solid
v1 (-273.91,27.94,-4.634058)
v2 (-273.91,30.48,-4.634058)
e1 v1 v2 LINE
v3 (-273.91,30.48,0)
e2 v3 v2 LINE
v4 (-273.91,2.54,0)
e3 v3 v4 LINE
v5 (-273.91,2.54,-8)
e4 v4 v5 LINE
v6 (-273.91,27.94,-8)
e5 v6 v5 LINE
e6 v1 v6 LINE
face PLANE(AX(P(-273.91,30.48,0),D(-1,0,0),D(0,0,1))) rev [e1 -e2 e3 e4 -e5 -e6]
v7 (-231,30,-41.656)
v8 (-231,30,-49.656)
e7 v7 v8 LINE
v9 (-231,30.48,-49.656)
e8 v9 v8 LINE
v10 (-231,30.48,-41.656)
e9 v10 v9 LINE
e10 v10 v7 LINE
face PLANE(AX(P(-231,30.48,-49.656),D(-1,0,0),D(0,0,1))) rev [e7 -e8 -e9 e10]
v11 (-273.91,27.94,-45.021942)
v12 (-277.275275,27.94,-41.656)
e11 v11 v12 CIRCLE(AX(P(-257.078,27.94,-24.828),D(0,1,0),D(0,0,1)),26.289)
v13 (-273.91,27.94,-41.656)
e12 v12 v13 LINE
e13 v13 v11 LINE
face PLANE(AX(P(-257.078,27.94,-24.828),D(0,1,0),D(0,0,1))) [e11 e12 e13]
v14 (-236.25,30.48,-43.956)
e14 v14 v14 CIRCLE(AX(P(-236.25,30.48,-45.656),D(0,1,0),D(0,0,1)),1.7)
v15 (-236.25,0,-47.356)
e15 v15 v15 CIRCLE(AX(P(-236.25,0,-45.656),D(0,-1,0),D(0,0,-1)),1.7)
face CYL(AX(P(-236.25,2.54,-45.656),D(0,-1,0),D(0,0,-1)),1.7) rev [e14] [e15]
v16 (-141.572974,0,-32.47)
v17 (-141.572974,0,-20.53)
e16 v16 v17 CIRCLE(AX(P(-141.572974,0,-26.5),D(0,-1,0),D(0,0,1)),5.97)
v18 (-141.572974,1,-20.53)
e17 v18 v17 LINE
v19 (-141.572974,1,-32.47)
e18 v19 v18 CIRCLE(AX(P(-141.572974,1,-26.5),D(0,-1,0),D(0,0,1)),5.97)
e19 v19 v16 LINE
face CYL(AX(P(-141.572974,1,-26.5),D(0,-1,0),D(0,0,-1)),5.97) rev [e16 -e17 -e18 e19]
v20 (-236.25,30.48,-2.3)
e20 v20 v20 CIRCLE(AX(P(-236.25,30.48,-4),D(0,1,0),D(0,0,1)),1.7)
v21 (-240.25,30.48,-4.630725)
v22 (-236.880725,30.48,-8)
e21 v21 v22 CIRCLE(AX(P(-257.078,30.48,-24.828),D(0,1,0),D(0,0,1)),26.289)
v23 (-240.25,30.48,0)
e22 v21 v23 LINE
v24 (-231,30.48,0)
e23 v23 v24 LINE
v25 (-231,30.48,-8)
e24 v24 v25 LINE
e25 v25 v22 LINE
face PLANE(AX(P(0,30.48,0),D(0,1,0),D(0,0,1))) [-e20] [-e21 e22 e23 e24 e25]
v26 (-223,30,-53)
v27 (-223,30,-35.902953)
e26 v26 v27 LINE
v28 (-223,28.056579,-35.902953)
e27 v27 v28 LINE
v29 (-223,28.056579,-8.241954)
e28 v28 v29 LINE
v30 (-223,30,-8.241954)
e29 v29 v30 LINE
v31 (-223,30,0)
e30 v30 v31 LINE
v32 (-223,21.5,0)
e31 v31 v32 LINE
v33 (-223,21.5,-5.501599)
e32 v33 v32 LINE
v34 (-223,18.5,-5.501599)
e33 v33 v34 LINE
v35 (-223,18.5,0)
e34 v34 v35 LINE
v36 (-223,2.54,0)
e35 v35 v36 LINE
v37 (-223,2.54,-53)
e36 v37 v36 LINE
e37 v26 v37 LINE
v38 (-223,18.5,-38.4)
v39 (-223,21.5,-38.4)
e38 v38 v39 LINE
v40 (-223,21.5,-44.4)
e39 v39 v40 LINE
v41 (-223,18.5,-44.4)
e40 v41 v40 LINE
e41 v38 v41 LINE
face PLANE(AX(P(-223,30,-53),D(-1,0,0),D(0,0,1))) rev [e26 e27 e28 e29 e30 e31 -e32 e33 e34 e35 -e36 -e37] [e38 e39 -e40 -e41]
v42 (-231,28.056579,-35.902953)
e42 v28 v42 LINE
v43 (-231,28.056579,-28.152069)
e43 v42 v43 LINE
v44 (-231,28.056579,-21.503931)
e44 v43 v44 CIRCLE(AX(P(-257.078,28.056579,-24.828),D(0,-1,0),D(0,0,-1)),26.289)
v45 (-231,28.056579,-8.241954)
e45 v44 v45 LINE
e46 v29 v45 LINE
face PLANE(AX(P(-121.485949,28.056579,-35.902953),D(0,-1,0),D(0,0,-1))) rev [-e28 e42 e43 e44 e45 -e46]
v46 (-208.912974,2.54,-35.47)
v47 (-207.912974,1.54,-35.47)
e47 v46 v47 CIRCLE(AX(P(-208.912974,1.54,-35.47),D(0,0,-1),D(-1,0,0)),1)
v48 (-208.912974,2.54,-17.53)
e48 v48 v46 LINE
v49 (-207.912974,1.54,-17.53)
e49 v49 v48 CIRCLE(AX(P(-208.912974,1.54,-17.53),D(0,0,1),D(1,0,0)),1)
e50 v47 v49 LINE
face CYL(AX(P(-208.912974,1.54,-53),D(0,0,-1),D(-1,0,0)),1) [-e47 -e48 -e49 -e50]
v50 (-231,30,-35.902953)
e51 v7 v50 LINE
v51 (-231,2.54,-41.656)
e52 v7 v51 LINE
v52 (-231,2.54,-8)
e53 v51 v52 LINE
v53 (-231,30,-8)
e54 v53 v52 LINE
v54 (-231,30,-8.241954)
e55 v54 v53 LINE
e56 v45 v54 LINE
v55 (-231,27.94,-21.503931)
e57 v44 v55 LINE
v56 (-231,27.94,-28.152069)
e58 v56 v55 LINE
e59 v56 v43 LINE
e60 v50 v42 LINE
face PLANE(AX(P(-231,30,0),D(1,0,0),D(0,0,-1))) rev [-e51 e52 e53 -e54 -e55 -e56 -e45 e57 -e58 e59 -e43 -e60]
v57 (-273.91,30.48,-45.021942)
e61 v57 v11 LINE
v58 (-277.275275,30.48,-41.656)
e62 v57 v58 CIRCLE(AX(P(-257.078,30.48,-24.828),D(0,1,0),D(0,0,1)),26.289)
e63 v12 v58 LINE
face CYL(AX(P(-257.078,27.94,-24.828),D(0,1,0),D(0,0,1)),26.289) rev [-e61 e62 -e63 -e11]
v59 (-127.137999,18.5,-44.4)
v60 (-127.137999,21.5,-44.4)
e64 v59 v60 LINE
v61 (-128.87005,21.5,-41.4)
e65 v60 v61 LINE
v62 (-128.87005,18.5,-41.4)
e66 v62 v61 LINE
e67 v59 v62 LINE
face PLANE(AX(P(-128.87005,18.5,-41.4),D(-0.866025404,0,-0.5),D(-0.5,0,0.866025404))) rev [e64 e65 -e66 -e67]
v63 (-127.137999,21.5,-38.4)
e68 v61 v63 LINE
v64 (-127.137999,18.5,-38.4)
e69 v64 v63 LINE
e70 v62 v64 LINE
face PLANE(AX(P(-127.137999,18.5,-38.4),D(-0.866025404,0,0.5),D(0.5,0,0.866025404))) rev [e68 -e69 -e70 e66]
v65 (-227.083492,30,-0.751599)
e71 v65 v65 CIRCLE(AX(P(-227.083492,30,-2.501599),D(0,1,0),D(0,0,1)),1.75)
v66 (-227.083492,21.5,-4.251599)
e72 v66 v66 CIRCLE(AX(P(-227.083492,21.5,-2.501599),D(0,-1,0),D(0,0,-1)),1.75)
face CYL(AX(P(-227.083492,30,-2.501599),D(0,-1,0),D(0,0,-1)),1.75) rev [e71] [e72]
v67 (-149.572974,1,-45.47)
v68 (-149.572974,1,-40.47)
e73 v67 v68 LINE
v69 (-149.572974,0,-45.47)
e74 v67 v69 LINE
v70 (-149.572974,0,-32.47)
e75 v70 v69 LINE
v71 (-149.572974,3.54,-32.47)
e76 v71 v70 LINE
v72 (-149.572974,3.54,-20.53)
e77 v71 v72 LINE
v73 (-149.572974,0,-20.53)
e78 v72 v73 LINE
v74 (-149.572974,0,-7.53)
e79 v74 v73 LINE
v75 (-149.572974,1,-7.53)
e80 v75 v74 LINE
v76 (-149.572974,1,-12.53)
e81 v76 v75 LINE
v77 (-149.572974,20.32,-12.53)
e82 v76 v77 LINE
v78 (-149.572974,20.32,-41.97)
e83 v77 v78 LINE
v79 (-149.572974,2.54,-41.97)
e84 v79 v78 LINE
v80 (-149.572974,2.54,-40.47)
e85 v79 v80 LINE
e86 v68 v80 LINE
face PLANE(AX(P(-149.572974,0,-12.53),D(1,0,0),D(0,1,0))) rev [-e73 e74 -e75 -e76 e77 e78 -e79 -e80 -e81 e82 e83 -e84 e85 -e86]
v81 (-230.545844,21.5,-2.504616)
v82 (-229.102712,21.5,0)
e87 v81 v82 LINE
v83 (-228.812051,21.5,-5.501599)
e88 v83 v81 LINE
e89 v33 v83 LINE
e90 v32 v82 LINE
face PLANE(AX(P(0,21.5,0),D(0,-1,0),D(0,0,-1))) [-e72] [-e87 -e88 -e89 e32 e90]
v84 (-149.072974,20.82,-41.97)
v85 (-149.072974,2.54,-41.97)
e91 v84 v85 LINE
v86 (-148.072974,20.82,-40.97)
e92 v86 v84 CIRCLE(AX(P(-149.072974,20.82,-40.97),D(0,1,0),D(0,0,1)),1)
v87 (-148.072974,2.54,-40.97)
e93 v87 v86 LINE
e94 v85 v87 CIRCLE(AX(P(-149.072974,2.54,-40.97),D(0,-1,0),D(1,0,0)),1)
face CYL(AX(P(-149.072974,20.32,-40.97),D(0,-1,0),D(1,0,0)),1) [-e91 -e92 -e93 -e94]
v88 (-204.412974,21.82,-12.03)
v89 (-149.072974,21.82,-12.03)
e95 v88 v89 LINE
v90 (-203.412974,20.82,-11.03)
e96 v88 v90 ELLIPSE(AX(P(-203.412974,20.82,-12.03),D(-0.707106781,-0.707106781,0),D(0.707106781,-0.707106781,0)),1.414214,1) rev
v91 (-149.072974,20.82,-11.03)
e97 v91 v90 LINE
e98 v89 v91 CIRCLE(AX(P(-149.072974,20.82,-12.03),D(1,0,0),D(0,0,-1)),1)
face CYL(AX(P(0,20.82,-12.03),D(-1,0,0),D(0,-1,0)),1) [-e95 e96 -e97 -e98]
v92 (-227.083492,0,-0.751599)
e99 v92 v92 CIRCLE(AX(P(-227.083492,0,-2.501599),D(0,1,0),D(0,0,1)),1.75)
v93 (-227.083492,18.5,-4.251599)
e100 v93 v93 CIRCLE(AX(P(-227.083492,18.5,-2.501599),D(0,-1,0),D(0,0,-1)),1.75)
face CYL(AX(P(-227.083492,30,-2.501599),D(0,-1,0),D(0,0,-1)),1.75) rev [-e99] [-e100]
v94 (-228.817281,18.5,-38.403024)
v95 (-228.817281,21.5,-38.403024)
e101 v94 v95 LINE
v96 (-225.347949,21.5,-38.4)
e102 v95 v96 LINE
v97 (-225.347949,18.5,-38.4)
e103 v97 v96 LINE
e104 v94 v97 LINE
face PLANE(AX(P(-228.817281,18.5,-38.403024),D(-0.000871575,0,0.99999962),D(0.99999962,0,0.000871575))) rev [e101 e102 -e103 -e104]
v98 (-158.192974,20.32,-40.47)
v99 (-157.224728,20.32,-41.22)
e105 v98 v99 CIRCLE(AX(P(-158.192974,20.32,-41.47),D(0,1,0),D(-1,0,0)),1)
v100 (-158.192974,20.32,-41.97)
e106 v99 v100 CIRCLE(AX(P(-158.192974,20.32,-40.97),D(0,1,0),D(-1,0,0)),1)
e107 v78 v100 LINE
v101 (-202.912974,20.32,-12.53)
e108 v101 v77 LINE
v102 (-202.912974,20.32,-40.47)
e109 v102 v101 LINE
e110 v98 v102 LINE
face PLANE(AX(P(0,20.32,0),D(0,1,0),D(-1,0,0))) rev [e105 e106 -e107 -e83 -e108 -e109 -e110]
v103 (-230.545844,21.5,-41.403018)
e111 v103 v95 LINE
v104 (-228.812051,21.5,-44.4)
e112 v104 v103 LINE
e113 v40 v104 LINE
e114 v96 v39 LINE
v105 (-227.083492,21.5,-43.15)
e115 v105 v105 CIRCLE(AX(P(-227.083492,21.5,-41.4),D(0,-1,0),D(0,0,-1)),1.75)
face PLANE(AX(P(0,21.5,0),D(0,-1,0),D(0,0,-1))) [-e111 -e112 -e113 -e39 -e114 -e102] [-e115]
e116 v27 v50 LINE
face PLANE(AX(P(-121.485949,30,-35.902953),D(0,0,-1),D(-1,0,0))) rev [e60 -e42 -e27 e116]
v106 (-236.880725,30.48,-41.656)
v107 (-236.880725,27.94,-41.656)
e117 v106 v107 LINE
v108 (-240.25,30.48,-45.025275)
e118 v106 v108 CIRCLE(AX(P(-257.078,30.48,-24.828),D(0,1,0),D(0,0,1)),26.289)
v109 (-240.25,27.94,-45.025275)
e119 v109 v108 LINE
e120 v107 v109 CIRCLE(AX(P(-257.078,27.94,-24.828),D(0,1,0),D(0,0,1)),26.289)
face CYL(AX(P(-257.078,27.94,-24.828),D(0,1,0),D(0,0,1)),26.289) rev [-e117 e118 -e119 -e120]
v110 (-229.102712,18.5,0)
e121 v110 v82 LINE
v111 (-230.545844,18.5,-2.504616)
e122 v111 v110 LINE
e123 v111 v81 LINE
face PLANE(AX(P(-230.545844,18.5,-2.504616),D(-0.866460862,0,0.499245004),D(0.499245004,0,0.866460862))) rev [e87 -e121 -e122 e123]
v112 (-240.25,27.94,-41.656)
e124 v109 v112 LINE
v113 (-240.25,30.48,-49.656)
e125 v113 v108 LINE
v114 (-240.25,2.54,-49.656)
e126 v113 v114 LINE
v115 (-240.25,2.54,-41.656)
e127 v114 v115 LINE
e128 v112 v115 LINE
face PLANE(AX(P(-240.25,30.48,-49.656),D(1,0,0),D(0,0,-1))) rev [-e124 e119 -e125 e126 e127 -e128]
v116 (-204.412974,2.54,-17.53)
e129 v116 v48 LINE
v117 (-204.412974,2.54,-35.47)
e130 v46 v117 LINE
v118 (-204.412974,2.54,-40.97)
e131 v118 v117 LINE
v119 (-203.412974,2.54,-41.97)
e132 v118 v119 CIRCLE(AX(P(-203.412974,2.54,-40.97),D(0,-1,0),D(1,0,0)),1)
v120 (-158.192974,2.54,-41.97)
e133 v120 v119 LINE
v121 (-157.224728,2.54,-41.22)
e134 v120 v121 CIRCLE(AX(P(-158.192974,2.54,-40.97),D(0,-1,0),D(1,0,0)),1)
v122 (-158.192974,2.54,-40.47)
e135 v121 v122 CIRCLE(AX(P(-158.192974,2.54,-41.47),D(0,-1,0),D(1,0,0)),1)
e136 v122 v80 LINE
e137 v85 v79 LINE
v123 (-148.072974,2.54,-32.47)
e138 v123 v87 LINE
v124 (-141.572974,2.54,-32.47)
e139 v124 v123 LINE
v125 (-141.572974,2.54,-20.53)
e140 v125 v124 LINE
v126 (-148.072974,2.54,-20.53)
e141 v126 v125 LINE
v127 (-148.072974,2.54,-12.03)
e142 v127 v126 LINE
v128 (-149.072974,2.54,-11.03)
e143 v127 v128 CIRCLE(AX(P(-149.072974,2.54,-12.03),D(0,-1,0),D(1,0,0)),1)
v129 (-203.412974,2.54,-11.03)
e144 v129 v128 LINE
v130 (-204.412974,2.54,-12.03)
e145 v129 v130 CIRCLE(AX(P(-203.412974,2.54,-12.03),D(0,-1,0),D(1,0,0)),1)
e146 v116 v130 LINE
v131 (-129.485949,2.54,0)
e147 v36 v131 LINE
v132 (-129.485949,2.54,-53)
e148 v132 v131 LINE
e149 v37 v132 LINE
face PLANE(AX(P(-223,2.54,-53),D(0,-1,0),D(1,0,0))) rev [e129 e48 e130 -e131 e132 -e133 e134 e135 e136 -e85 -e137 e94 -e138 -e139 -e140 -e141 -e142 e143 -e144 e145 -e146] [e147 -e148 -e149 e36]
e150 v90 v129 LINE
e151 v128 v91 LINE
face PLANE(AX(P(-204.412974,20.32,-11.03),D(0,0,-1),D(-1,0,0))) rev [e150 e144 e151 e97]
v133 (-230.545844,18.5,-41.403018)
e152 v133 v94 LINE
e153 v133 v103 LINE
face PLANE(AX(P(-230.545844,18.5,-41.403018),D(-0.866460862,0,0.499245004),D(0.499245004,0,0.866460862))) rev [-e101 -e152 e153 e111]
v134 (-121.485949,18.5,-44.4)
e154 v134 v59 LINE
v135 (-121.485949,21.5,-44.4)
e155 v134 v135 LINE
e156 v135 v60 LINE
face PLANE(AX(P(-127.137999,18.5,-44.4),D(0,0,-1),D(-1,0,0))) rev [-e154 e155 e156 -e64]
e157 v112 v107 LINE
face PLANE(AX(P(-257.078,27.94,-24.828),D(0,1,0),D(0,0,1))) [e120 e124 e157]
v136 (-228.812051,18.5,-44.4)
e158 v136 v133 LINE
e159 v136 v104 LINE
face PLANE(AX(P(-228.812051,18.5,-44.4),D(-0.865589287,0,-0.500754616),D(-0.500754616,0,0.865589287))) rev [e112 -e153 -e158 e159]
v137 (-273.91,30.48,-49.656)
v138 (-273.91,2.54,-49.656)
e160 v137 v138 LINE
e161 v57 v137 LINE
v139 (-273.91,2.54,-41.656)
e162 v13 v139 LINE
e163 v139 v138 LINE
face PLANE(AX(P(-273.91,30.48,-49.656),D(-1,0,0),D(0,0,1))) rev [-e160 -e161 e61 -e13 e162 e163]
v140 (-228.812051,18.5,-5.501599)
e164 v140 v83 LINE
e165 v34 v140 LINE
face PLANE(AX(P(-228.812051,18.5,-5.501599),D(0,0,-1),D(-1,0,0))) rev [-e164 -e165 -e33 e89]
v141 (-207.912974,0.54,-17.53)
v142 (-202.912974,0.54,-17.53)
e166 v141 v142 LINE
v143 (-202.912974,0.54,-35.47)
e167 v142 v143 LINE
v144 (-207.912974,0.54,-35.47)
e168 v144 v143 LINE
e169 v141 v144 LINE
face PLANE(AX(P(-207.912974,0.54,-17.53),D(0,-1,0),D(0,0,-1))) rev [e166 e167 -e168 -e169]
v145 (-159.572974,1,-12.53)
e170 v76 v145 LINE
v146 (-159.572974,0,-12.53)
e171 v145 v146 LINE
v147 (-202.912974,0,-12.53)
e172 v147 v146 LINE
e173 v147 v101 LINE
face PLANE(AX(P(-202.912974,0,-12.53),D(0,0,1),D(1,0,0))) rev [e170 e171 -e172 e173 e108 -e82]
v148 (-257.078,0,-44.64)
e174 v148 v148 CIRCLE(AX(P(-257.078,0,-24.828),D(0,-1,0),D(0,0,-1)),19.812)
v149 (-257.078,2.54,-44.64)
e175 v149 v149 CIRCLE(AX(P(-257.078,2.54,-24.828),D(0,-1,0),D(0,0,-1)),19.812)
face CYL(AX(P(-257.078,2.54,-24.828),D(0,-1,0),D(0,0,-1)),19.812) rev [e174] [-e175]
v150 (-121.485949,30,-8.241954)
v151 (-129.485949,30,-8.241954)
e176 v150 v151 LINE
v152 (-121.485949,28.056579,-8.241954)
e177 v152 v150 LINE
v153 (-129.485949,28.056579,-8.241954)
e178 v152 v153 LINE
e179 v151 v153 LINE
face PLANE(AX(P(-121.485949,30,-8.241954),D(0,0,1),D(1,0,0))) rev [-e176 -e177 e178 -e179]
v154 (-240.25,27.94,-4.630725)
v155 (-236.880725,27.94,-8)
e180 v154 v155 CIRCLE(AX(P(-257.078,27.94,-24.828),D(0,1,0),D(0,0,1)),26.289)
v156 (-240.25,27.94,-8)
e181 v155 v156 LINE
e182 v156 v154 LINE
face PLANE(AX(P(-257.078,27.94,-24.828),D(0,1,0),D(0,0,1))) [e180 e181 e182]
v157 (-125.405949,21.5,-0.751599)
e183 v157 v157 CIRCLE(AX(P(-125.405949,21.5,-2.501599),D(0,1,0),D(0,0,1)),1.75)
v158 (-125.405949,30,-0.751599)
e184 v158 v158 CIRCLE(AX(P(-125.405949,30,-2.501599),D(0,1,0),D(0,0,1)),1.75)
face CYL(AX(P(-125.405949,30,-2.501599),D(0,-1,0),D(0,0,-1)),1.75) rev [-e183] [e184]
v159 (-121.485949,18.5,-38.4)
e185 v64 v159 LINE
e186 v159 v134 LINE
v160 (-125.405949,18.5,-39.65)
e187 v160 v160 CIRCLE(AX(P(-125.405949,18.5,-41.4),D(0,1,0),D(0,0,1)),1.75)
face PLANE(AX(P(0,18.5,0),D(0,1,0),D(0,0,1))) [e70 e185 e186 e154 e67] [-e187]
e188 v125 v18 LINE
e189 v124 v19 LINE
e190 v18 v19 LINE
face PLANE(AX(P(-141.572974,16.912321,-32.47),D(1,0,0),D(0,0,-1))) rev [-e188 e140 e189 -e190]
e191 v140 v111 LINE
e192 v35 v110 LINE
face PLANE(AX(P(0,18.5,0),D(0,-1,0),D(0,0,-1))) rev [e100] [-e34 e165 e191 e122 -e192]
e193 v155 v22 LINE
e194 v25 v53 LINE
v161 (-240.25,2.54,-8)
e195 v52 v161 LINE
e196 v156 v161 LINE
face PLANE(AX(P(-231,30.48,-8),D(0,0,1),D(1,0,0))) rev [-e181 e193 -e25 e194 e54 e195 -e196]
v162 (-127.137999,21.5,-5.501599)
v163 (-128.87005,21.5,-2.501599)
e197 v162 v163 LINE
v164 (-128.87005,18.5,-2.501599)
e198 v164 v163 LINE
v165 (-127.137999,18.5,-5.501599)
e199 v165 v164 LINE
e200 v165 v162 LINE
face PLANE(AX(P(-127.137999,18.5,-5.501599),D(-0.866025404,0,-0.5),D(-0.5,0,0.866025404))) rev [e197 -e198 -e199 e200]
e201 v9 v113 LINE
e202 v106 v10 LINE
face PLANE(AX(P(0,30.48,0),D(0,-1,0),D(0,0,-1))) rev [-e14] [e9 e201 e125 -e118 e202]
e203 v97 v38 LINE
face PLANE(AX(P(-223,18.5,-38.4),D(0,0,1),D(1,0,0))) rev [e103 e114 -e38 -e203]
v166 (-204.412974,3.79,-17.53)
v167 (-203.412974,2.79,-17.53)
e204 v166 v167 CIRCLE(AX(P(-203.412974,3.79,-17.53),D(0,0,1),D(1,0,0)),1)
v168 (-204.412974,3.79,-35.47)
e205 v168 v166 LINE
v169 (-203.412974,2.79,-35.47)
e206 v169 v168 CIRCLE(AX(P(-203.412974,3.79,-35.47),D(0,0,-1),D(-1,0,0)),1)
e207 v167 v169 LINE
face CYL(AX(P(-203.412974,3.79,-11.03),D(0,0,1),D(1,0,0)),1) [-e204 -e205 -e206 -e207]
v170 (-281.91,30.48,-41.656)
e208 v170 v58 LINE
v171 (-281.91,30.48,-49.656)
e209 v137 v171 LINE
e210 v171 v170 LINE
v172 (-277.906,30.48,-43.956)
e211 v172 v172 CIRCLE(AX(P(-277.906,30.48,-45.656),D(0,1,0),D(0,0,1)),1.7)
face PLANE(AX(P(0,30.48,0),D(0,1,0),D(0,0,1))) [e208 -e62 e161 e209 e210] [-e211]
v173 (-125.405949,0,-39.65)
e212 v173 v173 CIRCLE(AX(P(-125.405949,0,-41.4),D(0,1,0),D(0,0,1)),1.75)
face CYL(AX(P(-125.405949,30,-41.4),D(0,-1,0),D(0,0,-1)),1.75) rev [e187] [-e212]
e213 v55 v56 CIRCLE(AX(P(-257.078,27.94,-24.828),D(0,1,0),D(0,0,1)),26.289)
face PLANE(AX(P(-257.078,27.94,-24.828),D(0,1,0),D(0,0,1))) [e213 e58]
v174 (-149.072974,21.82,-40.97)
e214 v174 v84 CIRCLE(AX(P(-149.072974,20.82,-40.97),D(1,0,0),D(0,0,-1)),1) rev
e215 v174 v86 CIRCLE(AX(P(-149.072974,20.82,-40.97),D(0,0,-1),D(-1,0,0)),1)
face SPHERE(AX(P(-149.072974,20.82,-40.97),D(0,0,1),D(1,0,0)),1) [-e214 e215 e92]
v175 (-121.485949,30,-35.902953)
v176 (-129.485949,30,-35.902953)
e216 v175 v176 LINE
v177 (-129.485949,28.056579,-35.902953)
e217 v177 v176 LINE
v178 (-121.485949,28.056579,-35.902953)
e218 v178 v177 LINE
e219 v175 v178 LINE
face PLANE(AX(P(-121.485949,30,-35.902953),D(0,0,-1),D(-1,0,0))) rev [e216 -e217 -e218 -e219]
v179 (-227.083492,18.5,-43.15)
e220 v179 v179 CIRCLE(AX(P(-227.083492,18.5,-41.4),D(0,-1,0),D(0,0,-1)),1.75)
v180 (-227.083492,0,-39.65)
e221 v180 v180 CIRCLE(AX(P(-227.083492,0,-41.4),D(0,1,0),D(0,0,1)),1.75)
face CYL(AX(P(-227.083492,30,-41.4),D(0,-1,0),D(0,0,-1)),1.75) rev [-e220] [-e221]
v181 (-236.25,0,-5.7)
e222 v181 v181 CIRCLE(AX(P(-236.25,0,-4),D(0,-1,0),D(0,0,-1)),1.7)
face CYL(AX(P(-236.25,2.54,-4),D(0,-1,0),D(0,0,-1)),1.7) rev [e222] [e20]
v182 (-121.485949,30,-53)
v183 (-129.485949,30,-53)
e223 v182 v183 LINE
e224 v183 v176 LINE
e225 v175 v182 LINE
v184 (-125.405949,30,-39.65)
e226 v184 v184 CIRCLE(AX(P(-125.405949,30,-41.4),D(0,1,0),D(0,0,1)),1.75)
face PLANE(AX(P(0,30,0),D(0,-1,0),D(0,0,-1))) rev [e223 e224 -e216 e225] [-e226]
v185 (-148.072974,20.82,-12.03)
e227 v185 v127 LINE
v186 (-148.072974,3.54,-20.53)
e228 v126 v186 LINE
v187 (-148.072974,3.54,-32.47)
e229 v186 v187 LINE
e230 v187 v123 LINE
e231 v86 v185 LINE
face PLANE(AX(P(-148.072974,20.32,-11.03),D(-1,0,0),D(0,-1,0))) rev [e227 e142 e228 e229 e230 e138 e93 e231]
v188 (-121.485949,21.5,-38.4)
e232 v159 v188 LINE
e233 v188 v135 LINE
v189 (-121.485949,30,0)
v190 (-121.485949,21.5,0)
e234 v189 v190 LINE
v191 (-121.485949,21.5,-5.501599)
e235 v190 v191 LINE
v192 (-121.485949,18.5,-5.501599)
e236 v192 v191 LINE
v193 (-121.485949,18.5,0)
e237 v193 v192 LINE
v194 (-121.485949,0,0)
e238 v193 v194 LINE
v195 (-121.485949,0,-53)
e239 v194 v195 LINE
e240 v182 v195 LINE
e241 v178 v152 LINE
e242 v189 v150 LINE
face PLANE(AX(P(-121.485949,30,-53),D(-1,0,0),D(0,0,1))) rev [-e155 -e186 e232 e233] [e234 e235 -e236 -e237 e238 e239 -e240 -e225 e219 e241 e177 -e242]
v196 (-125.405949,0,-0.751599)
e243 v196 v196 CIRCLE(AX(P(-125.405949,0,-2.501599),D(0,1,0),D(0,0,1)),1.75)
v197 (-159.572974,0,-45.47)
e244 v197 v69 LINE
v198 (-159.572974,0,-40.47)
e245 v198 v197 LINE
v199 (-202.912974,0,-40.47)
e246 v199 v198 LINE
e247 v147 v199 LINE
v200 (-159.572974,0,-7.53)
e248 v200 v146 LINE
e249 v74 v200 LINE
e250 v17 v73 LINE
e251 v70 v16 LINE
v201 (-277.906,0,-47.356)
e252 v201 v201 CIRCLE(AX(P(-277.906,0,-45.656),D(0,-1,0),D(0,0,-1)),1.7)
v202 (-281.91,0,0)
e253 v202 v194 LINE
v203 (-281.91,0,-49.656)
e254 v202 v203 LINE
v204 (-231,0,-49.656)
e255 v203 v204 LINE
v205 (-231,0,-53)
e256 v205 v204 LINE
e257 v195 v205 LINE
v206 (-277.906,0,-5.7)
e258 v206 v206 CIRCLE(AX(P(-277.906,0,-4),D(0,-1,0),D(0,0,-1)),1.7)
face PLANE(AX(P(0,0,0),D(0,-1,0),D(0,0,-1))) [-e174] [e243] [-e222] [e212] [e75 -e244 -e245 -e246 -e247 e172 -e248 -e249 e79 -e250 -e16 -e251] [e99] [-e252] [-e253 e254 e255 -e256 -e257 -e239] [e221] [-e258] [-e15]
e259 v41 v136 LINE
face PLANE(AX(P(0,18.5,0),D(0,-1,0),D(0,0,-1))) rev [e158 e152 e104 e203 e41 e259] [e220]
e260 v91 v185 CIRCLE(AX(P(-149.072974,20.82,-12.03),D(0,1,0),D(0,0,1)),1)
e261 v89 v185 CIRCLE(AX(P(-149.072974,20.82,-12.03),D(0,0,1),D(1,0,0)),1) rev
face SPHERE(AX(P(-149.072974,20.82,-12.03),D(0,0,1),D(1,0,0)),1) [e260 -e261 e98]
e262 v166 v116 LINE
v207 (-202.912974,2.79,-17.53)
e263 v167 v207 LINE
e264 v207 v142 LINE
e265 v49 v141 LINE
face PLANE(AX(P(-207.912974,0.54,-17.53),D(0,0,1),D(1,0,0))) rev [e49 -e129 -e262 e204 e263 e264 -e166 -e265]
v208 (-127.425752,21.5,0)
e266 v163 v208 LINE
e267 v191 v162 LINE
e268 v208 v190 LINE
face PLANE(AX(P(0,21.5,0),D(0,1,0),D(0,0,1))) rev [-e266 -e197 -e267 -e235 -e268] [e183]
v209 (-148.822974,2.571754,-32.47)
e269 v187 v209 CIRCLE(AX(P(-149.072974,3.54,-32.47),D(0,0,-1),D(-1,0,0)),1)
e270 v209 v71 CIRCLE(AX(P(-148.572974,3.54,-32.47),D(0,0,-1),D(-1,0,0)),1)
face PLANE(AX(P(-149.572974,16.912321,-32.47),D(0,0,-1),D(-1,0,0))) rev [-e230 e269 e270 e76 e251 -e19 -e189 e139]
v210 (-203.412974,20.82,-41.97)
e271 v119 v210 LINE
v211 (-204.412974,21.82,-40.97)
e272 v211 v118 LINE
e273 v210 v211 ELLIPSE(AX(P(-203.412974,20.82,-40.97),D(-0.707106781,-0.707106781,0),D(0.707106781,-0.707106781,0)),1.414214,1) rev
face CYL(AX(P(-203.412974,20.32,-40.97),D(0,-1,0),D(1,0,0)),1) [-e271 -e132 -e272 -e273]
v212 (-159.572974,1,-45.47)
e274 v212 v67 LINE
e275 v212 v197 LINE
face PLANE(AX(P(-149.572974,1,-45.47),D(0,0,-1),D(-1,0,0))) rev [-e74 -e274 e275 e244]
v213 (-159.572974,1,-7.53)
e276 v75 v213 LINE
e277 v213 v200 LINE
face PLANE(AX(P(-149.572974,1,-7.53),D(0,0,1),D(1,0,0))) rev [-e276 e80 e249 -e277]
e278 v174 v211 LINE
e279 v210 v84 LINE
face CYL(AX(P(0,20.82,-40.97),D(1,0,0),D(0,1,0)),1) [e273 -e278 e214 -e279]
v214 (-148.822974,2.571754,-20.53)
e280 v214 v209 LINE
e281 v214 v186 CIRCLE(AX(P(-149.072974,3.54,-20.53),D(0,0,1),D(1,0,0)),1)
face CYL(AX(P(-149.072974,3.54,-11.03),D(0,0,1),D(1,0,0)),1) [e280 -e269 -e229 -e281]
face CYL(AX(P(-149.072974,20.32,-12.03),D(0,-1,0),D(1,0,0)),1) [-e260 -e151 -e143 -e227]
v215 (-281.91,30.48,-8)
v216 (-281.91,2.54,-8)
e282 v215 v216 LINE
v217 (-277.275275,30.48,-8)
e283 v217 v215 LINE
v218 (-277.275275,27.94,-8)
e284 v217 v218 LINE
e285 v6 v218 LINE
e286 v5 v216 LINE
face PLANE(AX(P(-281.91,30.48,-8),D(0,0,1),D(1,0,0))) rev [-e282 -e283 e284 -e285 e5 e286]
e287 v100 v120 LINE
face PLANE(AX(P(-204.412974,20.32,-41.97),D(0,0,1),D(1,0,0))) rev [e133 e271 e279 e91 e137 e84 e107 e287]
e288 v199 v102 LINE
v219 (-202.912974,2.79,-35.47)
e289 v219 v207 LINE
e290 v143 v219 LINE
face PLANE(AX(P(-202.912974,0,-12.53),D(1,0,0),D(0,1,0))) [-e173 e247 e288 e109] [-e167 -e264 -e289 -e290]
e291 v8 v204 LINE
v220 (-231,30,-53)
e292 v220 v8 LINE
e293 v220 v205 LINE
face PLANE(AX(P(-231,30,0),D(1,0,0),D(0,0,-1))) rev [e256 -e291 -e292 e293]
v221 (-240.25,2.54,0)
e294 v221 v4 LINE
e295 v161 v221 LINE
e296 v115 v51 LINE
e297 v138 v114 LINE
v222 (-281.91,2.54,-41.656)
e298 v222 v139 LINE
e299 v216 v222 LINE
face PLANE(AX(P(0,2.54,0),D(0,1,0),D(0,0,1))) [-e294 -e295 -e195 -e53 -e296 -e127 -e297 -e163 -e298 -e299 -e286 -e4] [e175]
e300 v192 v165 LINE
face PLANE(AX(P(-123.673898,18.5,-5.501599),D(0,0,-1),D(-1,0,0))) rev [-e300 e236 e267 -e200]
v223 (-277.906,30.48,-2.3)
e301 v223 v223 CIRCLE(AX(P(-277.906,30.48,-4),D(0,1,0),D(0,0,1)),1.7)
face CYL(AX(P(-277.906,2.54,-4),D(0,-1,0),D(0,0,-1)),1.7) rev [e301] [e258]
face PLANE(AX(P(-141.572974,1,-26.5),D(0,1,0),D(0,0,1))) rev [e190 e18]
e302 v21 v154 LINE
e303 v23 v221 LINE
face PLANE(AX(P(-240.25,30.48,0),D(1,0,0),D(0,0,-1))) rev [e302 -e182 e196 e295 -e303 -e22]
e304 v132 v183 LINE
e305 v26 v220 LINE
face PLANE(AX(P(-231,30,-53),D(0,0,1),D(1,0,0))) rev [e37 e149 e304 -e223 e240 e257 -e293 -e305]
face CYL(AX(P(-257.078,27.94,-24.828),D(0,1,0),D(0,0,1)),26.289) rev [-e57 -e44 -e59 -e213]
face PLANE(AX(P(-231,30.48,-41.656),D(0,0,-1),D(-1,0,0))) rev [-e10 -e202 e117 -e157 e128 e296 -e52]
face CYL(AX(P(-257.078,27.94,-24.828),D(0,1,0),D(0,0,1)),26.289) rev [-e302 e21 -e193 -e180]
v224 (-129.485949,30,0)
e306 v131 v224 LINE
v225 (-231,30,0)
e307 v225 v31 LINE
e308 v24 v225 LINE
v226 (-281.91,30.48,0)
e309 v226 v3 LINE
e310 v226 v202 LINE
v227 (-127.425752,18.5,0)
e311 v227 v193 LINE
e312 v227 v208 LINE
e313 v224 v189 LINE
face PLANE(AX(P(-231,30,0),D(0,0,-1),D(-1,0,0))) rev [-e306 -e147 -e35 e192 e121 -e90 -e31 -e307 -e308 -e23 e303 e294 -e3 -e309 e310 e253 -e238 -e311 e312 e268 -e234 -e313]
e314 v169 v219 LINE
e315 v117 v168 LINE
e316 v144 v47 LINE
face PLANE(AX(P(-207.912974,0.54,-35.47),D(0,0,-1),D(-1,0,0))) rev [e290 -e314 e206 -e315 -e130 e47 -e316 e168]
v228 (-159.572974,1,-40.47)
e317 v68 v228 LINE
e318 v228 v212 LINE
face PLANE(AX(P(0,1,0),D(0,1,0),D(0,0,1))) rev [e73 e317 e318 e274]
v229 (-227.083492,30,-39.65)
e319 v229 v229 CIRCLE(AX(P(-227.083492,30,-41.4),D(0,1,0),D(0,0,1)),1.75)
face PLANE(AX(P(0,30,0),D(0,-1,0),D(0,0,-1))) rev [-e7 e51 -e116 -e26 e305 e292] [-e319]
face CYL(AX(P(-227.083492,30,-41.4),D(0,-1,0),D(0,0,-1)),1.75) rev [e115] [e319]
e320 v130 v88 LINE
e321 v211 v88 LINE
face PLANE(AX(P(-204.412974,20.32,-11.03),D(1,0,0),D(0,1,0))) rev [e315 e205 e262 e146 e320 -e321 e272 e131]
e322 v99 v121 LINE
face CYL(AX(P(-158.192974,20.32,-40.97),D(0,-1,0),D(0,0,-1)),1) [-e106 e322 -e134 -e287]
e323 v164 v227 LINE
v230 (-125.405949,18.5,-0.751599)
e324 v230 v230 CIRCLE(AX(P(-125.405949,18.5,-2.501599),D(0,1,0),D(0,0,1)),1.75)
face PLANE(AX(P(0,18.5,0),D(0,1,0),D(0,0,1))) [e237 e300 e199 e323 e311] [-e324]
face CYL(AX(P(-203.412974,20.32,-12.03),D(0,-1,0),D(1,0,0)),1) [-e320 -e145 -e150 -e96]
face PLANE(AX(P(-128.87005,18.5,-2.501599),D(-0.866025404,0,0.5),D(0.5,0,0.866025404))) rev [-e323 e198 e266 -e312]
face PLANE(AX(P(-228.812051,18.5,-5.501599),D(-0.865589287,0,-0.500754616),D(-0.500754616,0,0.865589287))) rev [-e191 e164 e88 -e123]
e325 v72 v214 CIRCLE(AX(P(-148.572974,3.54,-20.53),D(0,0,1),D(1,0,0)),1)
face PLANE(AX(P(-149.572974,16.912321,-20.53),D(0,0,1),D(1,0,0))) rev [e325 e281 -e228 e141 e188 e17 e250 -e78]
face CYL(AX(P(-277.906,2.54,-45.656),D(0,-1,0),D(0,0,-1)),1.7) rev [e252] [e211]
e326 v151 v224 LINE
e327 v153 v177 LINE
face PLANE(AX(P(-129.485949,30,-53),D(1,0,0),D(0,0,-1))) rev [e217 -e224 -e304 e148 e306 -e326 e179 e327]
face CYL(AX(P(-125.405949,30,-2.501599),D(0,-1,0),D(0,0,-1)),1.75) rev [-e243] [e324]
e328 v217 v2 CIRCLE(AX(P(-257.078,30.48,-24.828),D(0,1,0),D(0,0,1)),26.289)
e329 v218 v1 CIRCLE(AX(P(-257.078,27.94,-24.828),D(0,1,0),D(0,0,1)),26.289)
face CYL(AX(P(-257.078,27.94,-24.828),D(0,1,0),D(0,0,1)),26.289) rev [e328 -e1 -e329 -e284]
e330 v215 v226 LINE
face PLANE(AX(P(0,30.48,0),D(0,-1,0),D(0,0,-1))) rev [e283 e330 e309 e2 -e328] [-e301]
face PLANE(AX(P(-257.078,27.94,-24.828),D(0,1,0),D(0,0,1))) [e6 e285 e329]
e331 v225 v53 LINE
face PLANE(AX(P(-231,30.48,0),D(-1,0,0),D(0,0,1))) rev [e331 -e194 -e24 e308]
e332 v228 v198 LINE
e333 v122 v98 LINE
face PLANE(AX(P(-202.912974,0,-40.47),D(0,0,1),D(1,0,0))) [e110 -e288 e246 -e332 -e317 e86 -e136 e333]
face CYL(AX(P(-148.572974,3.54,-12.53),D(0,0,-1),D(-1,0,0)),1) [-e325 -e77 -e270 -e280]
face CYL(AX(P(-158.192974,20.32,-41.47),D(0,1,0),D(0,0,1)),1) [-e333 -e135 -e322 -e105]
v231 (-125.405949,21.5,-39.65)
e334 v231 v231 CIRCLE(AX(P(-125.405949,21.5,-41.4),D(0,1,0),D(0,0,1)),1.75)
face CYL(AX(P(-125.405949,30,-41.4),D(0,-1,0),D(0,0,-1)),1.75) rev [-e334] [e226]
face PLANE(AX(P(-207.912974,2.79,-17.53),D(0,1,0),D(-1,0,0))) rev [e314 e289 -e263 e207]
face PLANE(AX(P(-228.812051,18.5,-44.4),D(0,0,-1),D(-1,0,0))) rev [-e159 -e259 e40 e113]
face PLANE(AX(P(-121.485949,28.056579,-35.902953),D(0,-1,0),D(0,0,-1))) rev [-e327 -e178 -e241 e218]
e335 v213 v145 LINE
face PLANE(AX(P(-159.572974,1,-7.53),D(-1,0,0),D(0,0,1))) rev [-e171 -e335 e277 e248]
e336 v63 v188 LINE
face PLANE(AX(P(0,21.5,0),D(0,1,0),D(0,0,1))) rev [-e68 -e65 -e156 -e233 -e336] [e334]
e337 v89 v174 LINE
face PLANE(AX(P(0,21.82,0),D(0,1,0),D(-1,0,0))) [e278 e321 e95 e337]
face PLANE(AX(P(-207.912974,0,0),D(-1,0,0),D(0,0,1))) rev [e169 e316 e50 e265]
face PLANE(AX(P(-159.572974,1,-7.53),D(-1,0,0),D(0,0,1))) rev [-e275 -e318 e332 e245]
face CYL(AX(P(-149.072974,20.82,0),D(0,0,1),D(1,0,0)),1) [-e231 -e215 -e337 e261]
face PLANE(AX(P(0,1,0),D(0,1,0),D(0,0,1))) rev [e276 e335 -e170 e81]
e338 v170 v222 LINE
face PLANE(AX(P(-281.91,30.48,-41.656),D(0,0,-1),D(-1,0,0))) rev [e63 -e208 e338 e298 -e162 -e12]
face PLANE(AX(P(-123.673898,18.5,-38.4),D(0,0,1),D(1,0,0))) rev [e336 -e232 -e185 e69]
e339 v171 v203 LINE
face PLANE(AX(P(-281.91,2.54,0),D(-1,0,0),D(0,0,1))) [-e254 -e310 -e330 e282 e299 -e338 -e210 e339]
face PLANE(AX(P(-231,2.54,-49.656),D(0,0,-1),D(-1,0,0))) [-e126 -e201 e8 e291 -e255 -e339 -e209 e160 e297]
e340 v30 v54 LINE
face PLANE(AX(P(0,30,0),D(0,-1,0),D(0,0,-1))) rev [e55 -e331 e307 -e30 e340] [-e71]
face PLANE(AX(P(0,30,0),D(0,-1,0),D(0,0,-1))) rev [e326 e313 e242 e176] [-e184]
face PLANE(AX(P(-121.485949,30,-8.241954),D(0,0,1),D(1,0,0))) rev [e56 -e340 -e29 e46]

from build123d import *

# Parameters (mm, degrees)
SKETCH1_W           = 109.51405142
SKETCH1_H           = 53
SKETCH1_R           = 1.75
BOSS_EXTRUDE1_DEPTH = 30
SKETCH2_W           = 93.51405142
SKETCH2_H           = 27.46
CUT_EXTRUDE1_DEPTH  = 239.893281613
SKETCH4_W           = 53.34
SKETCH4_H           = 27.94
CUT_EXTRUDE3_DEPTH  = 239.587618287
SKETCH5_W           = 56.34
SKETCH5_H           = 30.94
SKETCH5_W_2         = 53.34
SKETCH5_H_2         = 27.94
BOSS_EXTRUDE2_DEPTH = 17.78
SKETCH6_W           = 56.34
SKETCH6_H           = 30.94
BOSS_EXTRUDE3_DEPTH = 1.5
SKETCH7_W           = 7.62
SKETCH7_H           = 17.78
CUT_EXTRUDE4_DEPTH  = 237.429314807
SKETCH9_W           = 17.94
SKETCH9_H           = 2.25
CUT_EXTRUDE5_DEPTH  = 5
SKETCH10_W          = 8
SKETCH10_H          = 11.94
CUT_EXTRUDE6_DEPTH  = 2.54
SKETCH13_W          = 10
SKETCH13_H          = 37.94
CUT_EXTRUDE8_DEPTH  = 1
FILLET2_R           = 1
SKETCH11_W          = 27.660998728
SKETCH11_H          = 1.943421484
CUT_EXTRUDE7_DEPTH  = 126.308928087
SKETCH14_W          = 50.91
SKETCH14_H          = 49.656
SKETCH14_R          = 19.812
SKETCH14_R_2        = 1.7
BOSS_EXTRUDE4_DEPTH = 2.54
SKETCH15_W          = 8
SKETCH15_H          = 8
SKETCH15_R          = 1.7
SKETCH15_W_2        = 9.25
BOSS_EXTRUDE5_DEPTH = 27.94
SKETCH16_R          = 26.289
CUT_EXTRUDE9_DEPTH  = 2.54
CUT_EXTRUDE2_DEPTH  = 1.5
CUT_EXTRUDE11_DEPTH = 1


with BuildPart() as part:
    # Sketch1 → Boss-Extrude1 (new body)
    with BuildSketch(Plane(origin=(0, 0, 0), x_dir=(1, 0, 0), z_dir=(0, 1, 0))):
        with Locations((-176.24297429, 26.5)):
            Rectangle(SKETCH1_W, SKETCH1_H)
        with Locations(Location((-227.083491572, 41.4, 0), (0, 0, 270))):
            Circle(SKETCH1_R, mode=Mode.SUBTRACT)
        with Locations(Location((-227.083491572, 2.501598642, 0), (0, 0, 270))):
            Circle(SKETCH1_R, mode=Mode.SUBTRACT)
        with Locations(Location((-125.40594858, 41.4, 0), (0, 0, 270))):
            Circle(SKETCH1_R, mode=Mode.SUBTRACT)
        with Locations(Location((-125.40594858, 2.501598642, 0), (0, 0, 270))):
            Circle(SKETCH1_R, mode=Mode.SUBTRACT)
    extrude(amount=BOSS_EXTRUDE1_DEPTH)

    # Sketch2 → Cut-Extrude1 (cut, through all)
    with BuildSketch(Plane.XY):
        with Locations((-176.24297429, 16.27)):
            Rectangle(SKETCH2_W, SKETCH2_H)
    extrude(amount=-CUT_EXTRUDE1_DEPTH, mode=Mode.SUBTRACT)

    # Sketch4 → Cut-Extrude3 (cut, through all)
    with BuildSketch(Plane(origin=(0, 2.54, 0), x_dir=(1, 0, 0), z_dir=(0, 1, 0))):
        with Locations((-176.24297429, 26.5)):
            Rectangle(SKETCH4_W, SKETCH4_H)
    extrude(amount=-CUT_EXTRUDE3_DEPTH, mode=Mode.SUBTRACT)

    # Sketch5 → Boss-Extrude2 (add)
    with BuildSketch(Plane(origin=(0, 2.54, 0), x_dir=(1, 0, 0), z_dir=(0, 1, 0))):
        with Locations((-176.24297429, 26.5)):
            Rectangle(SKETCH5_W, SKETCH5_H)
        with Locations((-176.24297429, 26.5)):
            Rectangle(SKETCH5_W_2, SKETCH5_H_2, mode=Mode.SUBTRACT)
    extrude(amount=BOSS_EXTRUDE2_DEPTH)

    # Sketch6 → Boss-Extrude3 (add)
    with BuildSketch(Plane(origin=(0, 20.32, 0), x_dir=(1, 0, 0), z_dir=(0, 1, 0))):
        with Locations((-176.24297429, 26.5)):
            Rectangle(SKETCH6_W, SKETCH6_H)
    extrude(amount=BOSS_EXTRUDE3_DEPTH)

    # Sketch7 → Cut-Extrude4 (cut, through all)
    with BuildSketch(Plane.XY.offset(-40.47)):
        with Locations((-153.38297429, 11.43)):
            Rectangle(SKETCH7_W, SKETCH7_H)
    extrude(amount=-CUT_EXTRUDE4_DEPTH, mode=Mode.SUBTRACT)

    # Sketch9 → Cut-Extrude5 (cut)
    with BuildSketch(Plane(origin=(-202.91297429, 0, 0), x_dir=(0, 0, -1), z_dir=(1, 0, 0))):
        with Locations((26.5, 1.665)):
            Rectangle(SKETCH9_W, SKETCH9_H)
    extrude(amount=-CUT_EXTRUDE5_DEPTH, mode=Mode.SUBTRACT)

    # Sketch10 → Cut-Extrude6 (cut)
    with BuildSketch(Plane.XZ):
        with Locations((-145.57297429, -26.5)):
            Rectangle(SKETCH10_W, SKETCH10_H)
    extrude(amount=-CUT_EXTRUDE6_DEPTH, mode=Mode.SUBTRACT)

    # Sketch13 → Cut-Extrude8 (cut)
    with BuildSketch(Plane.XZ):
        with Locations((-154.57297429, -26.5)):
            Rectangle(SKETCH13_W, SKETCH13_H)
    extrude(amount=-CUT_EXTRUDE8_DEPTH, mode=Mode.SUBTRACT)

    # Fillet2
    # the kernel refuses this fillet: 1 mm, written as the material it takes off along each edge
    with BuildSketch(Plane(origin=(-149.07297429, 20.82, -40.97), x_dir=(0, 1, 0), z_dir=(1, 0, 0))) as fillet2_piece_1_section:
        Polygon((0, 0), (FILLET2_R * 1.02, 0), (FILLET2_R * 1.02, -FILLET2_R * 1.02), (0, -FILLET2_R * 1.02), align=None)
    fillet2_piece_1 = extrude(amount=FILLET2_R * 1.02, mode=Mode.PRIVATE)
    fillet2_piece_1 = fillet2_piece_1 - Plane(origin=(-149.07297429, 20.82, -40.97), x_dir=(0, -0.7071067811865475, 0.7071067811865475), z_dir=(1, 0, 0)) * Sphere(FILLET2_R, mode=Mode.PRIVATE)
    add(fillet2_piece_1, mode=Mode.SUBTRACT)
    with BuildSketch(Plane(origin=(-149.07297429, 20.82, -12.03), x_dir=(0, 1, 0), z_dir=(1, 0, 0))) as fillet2_piece_2_section:
        Polygon((0, 0), (FILLET2_R * 1.02, 0), (FILLET2_R * 1.02, FILLET2_R * 1.02), (0, FILLET2_R * 1.02), align=None)
    fillet2_piece_2 = extrude(amount=FILLET2_R * 1.02, mode=Mode.PRIVATE)
    fillet2_piece_2 = fillet2_piece_2 - Plane(origin=(-149.07297429, 20.82, -12.03), x_dir=(0, -0.7071067811865475, -0.7071067811865475), z_dir=(1, 0, 0)) * Sphere(FILLET2_R, mode=Mode.PRIVATE)
    add(fillet2_piece_2, mode=Mode.SUBTRACT)
    with BuildSketch(Plane(origin=(-157.19297429, 20.32, -40.47), x_dir=(0, 0, -1), z_dir=(0, -1, 0))) as fillet2_piece_3:
        with BuildLine():
            CenterArc((FILLET2_R, -FILLET2_R), FILLET2_R, 90, 90)
            Line((0, -FILLET2_R), (0, 0))
            Line((0, 0), (FILLET2_R, 0))
        make_face()
    extrude(amount=17.78, mode=Mode.SUBTRACT)
    with BuildSketch(Plane(origin=(-148.07297429, 2.54, -20.53), x_dir=(-1, 0, 0), z_dir=(0, 0, -1)), Plane(origin=(-149.57297429, 2.54, -20.53), x_dir=(0, 1, 0), z_dir=(0, 0, -1))) as fillet2_piece_4:
        with BuildLine():
            CenterArc((FILLET2_R, FILLET2_R), FILLET2_R, 180, 90)
            Line((0, FILLET2_R), (0, 0))
            Line((0, 0), (FILLET2_R, 0))
        make_face()
    extrude(amount=11.94, mode=Mode.SUBTRACT)
    with BuildSketch(Plane(origin=(-207.91297429, 2.54, -17.53), x_dir=(-1, 0, 0), z_dir=(0, 0, -1))) as fillet2_piece_5:
        with BuildLine():
            CenterArc((FILLET2_R, -FILLET2_R), FILLET2_R, 90, 90)
            Line((0, -FILLET2_R), (0, 0))
            Line((0, 0), (FILLET2_R, 0))
        make_face()
    extrude(amount=17.94, mode=Mode.SUBTRACT)
    with BuildSketch(Plane(origin=(-204.41297429, 2.79, -35.47), x_dir=(1, 0, 0), z_dir=(0, 0, 1))) as fillet2_piece_6:
        with BuildLine():
            CenterArc((FILLET2_R, FILLET2_R), FILLET2_R, 180, 90)
            Line((0, FILLET2_R), (0, 0))
            Line((0, 0), (FILLET2_R, 0))
        make_face()
    extrude(amount=17.94, mode=Mode.SUBTRACT)
    with BuildSketch(Plane(origin=(-157.19297429, 20.32, -41.97), x_dir=(0, 0, 1), z_dir=(0, -1, 0))) as fillet2_piece_7:
        with BuildLine():
            CenterArc((FILLET2_R, FILLET2_R), FILLET2_R, 180, 90)
            Line((0, FILLET2_R), (0, 0))
            Line((0, 0), (FILLET2_R, 0))
        make_face()
    extrude(amount=17.78, mode=Mode.SUBTRACT)
    with BuildSketch(Plane(origin=(-206.91297429, 21.82, -41.97), x_dir=(0, 0, 1), z_dir=(1, 0, 0)), Plane(origin=(-149.07297429, 21.82, -11.03), x_dir=(0, 0, -1), z_dir=(-1, 0, 0))) as fillet2_piece_8:
        with BuildLine():
            CenterArc((FILLET2_R, FILLET2_R), FILLET2_R, 180, 90)
            Line((0, FILLET2_R), (0, 0))
            Line((0, 0), (FILLET2_R, 0))
        make_face()
    extrude(amount=57.84, mode=Mode.SUBTRACT)
    with BuildSketch(Plane(origin=(-204.41297429, 2.54, -41.97), x_dir=(0, 0, 1), z_dir=(0, 1, 0))) as fillet2_piece_9:
        with BuildLine():
            CenterArc((FILLET2_R, FILLET2_R), FILLET2_R, 180, 90)
            Line((0, FILLET2_R), (0, 0))
            Line((0, 0), (FILLET2_R, 0))
        make_face()
    extrude(amount=21.78, mode=Mode.SUBTRACT)
    with BuildSketch(Plane(origin=(-148.07297429, 2.54, -41.97), x_dir=(0, 0, 1), z_dir=(0, 1, 0))) as fillet2_piece_10:
        with BuildLine():
            CenterArc((FILLET2_R, -FILLET2_R), FILLET2_R, 90, 90)
            Line((0, -FILLET2_R), (0, 0))
            Line((0, 0), (FILLET2_R, 0))
        make_face()
    extrude(amount=18.28, mode=Mode.SUBTRACT)
    with BuildSketch(Plane(origin=(-148.07297429, 21.82, -40.97), x_dir=(0, -1, 0), z_dir=(0, 0, 1))) as fillet2_piece_11:
        with BuildLine():
            CenterArc((FILLET2_R, -FILLET2_R), FILLET2_R, 90, 90)
            Line((0, -FILLET2_R), (0, 0))
            Line((0, 0), (FILLET2_R, 0))
        make_face()
    extrude(amount=28.94, mode=Mode.SUBTRACT)
    with BuildSketch(Plane(origin=(-148.07297429, 2.54, -11.03), x_dir=(0, 0, -1), z_dir=(0, 1, 0))) as fillet2_piece_12:
        with BuildLine():
            CenterArc((FILLET2_R, FILLET2_R), FILLET2_R, 180, 90)
            Line((0, FILLET2_R), (0, 0))
            Line((0, 0), (FILLET2_R, 0))
        make_face()
    extrude(amount=18.28, mode=Mode.SUBTRACT)
    with BuildSketch(Plane(origin=(-204.41297429, 24.32, -11.03), x_dir=(1, 0, 0), z_dir=(0, -1, 0))) as fillet2_piece_13:
        with BuildLine():
            CenterArc((FILLET2_R, -FILLET2_R), FILLET2_R, 90, 90)
            Line((0, -FILLET2_R), (0, 0))
            Line((0, 0), (FILLET2_R, 0))
        make_face()
    extrude(amount=21.78, mode=Mode.SUBTRACT)

    # Sketch11 → Cut-Extrude7 (cut, through all)
    with BuildSketch(Plane.ZY.offset(231)):
        with Locations((-22.072453187, 29.028289258)):
            Rectangle(SKETCH11_W, SKETCH11_H)
    extrude(amount=-CUT_EXTRUDE7_DEPTH, mode=Mode.SUBTRACT)

    # Sketch14 → Boss-Extrude4 (add)
    with BuildSketch(Plane.XZ):
        with Locations((-256.455, -24.828)):
            Rectangle(SKETCH14_W, SKETCH14_H)
        with Locations(Location((-257.078, -24.828, 0), (0, 0, 270))):
            Circle(SKETCH14_R, mode=Mode.SUBTRACT)
        with Locations(Location((-277.906, -45.656, 0), (0, 0, 270))):
            Circle(SKETCH14_R_2, mode=Mode.SUBTRACT)
        with Locations(Location((-236.25, -45.656, 0), (0, 0, 270))):
            Circle(SKETCH14_R_2, mode=Mode.SUBTRACT)
        with Locations(Location((-236.25, -4, 0), (0, 0, 270))):
            Circle(SKETCH14_R_2, mode=Mode.SUBTRACT)
        with Locations(Location((-277.906, -4, 0), (0, 0, 270))):
            Circle(SKETCH14_R_2, mode=Mode.SUBTRACT)
    extrude(amount=-BOSS_EXTRUDE4_DEPTH)

    # Sketch15 → Boss-Extrude5 (add)
    # profile 1 of 4: a face of its own
    with BuildSketch(Plane(origin=(0, 2.54, 0), x_dir=(1, 0, 0), z_dir=(0, 1, 0))):
        with Locations((-277.91, 45.656)):
            Rectangle(SKETCH15_W, SKETCH15_H)
        with Locations(Location((-277.906, 45.656, 0), (0, 0, 90))):
            Circle(SKETCH15_R, mode=Mode.SUBTRACT)
    # profile 2 of 4: a face of its own
    with BuildSketch(Plane(origin=(0, 2.54, 0), x_dir=(1, 0, 0), z_dir=(0, 1, 0))):
        with Locations((-235.625, 45.656)):
            Rectangle(SKETCH15_W_2, SKETCH15_H)
        with Locations(Location((-236.25, 45.656, 0), (0, 0, 90))):
            Circle(SKETCH15_R, mode=Mode.SUBTRACT)
    # profile 3 of 4: a face of its own
    with BuildSketch(Plane(origin=(0, 2.54, 0), x_dir=(1, 0, 0), z_dir=(0, 1, 0))):
        with Locations((-235.625, 4)):
            Rectangle(SKETCH15_W_2, SKETCH15_H)
        with Locations(Location((-236.25, 4, 0), (0, 0, 90))):
            Circle(SKETCH15_R, mode=Mode.SUBTRACT)
    # profile 4 of 4: a face of its own
    with BuildSketch(Plane(origin=(0, 2.54, 0), x_dir=(1, 0, 0), z_dir=(0, 1, 0))):
        with Locations((-277.91, 4)):
            Rectangle(SKETCH15_W, SKETCH15_H)
        with Locations(Location((-277.906, 4, 0), (0, 0, 90))):
            Circle(SKETCH15_R, mode=Mode.SUBTRACT)
    extrude(amount=BOSS_EXTRUDE5_DEPTH)

    # Sketch16 → Cut-Extrude9 (cut)
    with BuildSketch(Plane(origin=(0, 30.48, 0), x_dir=(1, 0, 0), z_dir=(0, 1, 0))):
        with Locations((-257.078, 24.828)):
            Circle(SKETCH16_R)
    extrude(amount=-CUT_EXTRUDE9_DEPTH, mode=Mode.SUBTRACT)

    # Sketch3 → Cut-Extrude2 (cut, symmetric)
    with BuildSketch(Plane(origin=(0, 20, 0), x_dir=(1, 0, 0), z_dir=(0, 1, 0))):
        Polygon((-123.673897772, 5.501598642), (-121.48594858, 5.501598642), (-121.48594858, -0.498401358), (-123.673897772, -0.498401358), (-127.137999388, -0.498401358), (-128.870050195, 2.501598642), (-127.137999388, 5.501598642), align=None)
        Polygon((-121.48594858, 44.4), (-123.673897772, 44.4), (-127.137999388, 44.4), (-128.870050195, 41.4), (-127.137999388, 38.4), (-123.673897772, 38.4), (-121.48594858, 38.4), align=None)
        Polygon((-228.812050808, 5.501598642), (-230.545843893, 2.504616343), (-228.817281138, -0.495377574), (-225.347949192, -0.498401358), (-222.995024046, -0.498401358), (-222.995024046, 5.501598642), align=None)
        Polygon((-228.812050808, 44.4), (-230.545843893, 41.403017701), (-228.817281138, 38.403023784), (-225.347949192, 38.4), (-223, 38.4), (-223, 44.4), align=None)
    extrude(amount=CUT_EXTRUDE2_DEPTH, both=True, mode=Mode.SUBTRACT)

    # Sketch17 → Cut-Extrude11 (cut)
    with BuildSketch(Plane.XZ):
        with BuildLine():
            Line((-141.57297429, -20.53), (-141.57297429, -32.47))
            ThreePointArc((-141.57297429, -32.47), (-135.60297429, -26.5), (-141.57297429, -20.53))
        make_face()
    extrude(amount=-CUT_EXTRUDE11_DEPTH, mode=Mode.SUBTRACT)


solid = part.part
